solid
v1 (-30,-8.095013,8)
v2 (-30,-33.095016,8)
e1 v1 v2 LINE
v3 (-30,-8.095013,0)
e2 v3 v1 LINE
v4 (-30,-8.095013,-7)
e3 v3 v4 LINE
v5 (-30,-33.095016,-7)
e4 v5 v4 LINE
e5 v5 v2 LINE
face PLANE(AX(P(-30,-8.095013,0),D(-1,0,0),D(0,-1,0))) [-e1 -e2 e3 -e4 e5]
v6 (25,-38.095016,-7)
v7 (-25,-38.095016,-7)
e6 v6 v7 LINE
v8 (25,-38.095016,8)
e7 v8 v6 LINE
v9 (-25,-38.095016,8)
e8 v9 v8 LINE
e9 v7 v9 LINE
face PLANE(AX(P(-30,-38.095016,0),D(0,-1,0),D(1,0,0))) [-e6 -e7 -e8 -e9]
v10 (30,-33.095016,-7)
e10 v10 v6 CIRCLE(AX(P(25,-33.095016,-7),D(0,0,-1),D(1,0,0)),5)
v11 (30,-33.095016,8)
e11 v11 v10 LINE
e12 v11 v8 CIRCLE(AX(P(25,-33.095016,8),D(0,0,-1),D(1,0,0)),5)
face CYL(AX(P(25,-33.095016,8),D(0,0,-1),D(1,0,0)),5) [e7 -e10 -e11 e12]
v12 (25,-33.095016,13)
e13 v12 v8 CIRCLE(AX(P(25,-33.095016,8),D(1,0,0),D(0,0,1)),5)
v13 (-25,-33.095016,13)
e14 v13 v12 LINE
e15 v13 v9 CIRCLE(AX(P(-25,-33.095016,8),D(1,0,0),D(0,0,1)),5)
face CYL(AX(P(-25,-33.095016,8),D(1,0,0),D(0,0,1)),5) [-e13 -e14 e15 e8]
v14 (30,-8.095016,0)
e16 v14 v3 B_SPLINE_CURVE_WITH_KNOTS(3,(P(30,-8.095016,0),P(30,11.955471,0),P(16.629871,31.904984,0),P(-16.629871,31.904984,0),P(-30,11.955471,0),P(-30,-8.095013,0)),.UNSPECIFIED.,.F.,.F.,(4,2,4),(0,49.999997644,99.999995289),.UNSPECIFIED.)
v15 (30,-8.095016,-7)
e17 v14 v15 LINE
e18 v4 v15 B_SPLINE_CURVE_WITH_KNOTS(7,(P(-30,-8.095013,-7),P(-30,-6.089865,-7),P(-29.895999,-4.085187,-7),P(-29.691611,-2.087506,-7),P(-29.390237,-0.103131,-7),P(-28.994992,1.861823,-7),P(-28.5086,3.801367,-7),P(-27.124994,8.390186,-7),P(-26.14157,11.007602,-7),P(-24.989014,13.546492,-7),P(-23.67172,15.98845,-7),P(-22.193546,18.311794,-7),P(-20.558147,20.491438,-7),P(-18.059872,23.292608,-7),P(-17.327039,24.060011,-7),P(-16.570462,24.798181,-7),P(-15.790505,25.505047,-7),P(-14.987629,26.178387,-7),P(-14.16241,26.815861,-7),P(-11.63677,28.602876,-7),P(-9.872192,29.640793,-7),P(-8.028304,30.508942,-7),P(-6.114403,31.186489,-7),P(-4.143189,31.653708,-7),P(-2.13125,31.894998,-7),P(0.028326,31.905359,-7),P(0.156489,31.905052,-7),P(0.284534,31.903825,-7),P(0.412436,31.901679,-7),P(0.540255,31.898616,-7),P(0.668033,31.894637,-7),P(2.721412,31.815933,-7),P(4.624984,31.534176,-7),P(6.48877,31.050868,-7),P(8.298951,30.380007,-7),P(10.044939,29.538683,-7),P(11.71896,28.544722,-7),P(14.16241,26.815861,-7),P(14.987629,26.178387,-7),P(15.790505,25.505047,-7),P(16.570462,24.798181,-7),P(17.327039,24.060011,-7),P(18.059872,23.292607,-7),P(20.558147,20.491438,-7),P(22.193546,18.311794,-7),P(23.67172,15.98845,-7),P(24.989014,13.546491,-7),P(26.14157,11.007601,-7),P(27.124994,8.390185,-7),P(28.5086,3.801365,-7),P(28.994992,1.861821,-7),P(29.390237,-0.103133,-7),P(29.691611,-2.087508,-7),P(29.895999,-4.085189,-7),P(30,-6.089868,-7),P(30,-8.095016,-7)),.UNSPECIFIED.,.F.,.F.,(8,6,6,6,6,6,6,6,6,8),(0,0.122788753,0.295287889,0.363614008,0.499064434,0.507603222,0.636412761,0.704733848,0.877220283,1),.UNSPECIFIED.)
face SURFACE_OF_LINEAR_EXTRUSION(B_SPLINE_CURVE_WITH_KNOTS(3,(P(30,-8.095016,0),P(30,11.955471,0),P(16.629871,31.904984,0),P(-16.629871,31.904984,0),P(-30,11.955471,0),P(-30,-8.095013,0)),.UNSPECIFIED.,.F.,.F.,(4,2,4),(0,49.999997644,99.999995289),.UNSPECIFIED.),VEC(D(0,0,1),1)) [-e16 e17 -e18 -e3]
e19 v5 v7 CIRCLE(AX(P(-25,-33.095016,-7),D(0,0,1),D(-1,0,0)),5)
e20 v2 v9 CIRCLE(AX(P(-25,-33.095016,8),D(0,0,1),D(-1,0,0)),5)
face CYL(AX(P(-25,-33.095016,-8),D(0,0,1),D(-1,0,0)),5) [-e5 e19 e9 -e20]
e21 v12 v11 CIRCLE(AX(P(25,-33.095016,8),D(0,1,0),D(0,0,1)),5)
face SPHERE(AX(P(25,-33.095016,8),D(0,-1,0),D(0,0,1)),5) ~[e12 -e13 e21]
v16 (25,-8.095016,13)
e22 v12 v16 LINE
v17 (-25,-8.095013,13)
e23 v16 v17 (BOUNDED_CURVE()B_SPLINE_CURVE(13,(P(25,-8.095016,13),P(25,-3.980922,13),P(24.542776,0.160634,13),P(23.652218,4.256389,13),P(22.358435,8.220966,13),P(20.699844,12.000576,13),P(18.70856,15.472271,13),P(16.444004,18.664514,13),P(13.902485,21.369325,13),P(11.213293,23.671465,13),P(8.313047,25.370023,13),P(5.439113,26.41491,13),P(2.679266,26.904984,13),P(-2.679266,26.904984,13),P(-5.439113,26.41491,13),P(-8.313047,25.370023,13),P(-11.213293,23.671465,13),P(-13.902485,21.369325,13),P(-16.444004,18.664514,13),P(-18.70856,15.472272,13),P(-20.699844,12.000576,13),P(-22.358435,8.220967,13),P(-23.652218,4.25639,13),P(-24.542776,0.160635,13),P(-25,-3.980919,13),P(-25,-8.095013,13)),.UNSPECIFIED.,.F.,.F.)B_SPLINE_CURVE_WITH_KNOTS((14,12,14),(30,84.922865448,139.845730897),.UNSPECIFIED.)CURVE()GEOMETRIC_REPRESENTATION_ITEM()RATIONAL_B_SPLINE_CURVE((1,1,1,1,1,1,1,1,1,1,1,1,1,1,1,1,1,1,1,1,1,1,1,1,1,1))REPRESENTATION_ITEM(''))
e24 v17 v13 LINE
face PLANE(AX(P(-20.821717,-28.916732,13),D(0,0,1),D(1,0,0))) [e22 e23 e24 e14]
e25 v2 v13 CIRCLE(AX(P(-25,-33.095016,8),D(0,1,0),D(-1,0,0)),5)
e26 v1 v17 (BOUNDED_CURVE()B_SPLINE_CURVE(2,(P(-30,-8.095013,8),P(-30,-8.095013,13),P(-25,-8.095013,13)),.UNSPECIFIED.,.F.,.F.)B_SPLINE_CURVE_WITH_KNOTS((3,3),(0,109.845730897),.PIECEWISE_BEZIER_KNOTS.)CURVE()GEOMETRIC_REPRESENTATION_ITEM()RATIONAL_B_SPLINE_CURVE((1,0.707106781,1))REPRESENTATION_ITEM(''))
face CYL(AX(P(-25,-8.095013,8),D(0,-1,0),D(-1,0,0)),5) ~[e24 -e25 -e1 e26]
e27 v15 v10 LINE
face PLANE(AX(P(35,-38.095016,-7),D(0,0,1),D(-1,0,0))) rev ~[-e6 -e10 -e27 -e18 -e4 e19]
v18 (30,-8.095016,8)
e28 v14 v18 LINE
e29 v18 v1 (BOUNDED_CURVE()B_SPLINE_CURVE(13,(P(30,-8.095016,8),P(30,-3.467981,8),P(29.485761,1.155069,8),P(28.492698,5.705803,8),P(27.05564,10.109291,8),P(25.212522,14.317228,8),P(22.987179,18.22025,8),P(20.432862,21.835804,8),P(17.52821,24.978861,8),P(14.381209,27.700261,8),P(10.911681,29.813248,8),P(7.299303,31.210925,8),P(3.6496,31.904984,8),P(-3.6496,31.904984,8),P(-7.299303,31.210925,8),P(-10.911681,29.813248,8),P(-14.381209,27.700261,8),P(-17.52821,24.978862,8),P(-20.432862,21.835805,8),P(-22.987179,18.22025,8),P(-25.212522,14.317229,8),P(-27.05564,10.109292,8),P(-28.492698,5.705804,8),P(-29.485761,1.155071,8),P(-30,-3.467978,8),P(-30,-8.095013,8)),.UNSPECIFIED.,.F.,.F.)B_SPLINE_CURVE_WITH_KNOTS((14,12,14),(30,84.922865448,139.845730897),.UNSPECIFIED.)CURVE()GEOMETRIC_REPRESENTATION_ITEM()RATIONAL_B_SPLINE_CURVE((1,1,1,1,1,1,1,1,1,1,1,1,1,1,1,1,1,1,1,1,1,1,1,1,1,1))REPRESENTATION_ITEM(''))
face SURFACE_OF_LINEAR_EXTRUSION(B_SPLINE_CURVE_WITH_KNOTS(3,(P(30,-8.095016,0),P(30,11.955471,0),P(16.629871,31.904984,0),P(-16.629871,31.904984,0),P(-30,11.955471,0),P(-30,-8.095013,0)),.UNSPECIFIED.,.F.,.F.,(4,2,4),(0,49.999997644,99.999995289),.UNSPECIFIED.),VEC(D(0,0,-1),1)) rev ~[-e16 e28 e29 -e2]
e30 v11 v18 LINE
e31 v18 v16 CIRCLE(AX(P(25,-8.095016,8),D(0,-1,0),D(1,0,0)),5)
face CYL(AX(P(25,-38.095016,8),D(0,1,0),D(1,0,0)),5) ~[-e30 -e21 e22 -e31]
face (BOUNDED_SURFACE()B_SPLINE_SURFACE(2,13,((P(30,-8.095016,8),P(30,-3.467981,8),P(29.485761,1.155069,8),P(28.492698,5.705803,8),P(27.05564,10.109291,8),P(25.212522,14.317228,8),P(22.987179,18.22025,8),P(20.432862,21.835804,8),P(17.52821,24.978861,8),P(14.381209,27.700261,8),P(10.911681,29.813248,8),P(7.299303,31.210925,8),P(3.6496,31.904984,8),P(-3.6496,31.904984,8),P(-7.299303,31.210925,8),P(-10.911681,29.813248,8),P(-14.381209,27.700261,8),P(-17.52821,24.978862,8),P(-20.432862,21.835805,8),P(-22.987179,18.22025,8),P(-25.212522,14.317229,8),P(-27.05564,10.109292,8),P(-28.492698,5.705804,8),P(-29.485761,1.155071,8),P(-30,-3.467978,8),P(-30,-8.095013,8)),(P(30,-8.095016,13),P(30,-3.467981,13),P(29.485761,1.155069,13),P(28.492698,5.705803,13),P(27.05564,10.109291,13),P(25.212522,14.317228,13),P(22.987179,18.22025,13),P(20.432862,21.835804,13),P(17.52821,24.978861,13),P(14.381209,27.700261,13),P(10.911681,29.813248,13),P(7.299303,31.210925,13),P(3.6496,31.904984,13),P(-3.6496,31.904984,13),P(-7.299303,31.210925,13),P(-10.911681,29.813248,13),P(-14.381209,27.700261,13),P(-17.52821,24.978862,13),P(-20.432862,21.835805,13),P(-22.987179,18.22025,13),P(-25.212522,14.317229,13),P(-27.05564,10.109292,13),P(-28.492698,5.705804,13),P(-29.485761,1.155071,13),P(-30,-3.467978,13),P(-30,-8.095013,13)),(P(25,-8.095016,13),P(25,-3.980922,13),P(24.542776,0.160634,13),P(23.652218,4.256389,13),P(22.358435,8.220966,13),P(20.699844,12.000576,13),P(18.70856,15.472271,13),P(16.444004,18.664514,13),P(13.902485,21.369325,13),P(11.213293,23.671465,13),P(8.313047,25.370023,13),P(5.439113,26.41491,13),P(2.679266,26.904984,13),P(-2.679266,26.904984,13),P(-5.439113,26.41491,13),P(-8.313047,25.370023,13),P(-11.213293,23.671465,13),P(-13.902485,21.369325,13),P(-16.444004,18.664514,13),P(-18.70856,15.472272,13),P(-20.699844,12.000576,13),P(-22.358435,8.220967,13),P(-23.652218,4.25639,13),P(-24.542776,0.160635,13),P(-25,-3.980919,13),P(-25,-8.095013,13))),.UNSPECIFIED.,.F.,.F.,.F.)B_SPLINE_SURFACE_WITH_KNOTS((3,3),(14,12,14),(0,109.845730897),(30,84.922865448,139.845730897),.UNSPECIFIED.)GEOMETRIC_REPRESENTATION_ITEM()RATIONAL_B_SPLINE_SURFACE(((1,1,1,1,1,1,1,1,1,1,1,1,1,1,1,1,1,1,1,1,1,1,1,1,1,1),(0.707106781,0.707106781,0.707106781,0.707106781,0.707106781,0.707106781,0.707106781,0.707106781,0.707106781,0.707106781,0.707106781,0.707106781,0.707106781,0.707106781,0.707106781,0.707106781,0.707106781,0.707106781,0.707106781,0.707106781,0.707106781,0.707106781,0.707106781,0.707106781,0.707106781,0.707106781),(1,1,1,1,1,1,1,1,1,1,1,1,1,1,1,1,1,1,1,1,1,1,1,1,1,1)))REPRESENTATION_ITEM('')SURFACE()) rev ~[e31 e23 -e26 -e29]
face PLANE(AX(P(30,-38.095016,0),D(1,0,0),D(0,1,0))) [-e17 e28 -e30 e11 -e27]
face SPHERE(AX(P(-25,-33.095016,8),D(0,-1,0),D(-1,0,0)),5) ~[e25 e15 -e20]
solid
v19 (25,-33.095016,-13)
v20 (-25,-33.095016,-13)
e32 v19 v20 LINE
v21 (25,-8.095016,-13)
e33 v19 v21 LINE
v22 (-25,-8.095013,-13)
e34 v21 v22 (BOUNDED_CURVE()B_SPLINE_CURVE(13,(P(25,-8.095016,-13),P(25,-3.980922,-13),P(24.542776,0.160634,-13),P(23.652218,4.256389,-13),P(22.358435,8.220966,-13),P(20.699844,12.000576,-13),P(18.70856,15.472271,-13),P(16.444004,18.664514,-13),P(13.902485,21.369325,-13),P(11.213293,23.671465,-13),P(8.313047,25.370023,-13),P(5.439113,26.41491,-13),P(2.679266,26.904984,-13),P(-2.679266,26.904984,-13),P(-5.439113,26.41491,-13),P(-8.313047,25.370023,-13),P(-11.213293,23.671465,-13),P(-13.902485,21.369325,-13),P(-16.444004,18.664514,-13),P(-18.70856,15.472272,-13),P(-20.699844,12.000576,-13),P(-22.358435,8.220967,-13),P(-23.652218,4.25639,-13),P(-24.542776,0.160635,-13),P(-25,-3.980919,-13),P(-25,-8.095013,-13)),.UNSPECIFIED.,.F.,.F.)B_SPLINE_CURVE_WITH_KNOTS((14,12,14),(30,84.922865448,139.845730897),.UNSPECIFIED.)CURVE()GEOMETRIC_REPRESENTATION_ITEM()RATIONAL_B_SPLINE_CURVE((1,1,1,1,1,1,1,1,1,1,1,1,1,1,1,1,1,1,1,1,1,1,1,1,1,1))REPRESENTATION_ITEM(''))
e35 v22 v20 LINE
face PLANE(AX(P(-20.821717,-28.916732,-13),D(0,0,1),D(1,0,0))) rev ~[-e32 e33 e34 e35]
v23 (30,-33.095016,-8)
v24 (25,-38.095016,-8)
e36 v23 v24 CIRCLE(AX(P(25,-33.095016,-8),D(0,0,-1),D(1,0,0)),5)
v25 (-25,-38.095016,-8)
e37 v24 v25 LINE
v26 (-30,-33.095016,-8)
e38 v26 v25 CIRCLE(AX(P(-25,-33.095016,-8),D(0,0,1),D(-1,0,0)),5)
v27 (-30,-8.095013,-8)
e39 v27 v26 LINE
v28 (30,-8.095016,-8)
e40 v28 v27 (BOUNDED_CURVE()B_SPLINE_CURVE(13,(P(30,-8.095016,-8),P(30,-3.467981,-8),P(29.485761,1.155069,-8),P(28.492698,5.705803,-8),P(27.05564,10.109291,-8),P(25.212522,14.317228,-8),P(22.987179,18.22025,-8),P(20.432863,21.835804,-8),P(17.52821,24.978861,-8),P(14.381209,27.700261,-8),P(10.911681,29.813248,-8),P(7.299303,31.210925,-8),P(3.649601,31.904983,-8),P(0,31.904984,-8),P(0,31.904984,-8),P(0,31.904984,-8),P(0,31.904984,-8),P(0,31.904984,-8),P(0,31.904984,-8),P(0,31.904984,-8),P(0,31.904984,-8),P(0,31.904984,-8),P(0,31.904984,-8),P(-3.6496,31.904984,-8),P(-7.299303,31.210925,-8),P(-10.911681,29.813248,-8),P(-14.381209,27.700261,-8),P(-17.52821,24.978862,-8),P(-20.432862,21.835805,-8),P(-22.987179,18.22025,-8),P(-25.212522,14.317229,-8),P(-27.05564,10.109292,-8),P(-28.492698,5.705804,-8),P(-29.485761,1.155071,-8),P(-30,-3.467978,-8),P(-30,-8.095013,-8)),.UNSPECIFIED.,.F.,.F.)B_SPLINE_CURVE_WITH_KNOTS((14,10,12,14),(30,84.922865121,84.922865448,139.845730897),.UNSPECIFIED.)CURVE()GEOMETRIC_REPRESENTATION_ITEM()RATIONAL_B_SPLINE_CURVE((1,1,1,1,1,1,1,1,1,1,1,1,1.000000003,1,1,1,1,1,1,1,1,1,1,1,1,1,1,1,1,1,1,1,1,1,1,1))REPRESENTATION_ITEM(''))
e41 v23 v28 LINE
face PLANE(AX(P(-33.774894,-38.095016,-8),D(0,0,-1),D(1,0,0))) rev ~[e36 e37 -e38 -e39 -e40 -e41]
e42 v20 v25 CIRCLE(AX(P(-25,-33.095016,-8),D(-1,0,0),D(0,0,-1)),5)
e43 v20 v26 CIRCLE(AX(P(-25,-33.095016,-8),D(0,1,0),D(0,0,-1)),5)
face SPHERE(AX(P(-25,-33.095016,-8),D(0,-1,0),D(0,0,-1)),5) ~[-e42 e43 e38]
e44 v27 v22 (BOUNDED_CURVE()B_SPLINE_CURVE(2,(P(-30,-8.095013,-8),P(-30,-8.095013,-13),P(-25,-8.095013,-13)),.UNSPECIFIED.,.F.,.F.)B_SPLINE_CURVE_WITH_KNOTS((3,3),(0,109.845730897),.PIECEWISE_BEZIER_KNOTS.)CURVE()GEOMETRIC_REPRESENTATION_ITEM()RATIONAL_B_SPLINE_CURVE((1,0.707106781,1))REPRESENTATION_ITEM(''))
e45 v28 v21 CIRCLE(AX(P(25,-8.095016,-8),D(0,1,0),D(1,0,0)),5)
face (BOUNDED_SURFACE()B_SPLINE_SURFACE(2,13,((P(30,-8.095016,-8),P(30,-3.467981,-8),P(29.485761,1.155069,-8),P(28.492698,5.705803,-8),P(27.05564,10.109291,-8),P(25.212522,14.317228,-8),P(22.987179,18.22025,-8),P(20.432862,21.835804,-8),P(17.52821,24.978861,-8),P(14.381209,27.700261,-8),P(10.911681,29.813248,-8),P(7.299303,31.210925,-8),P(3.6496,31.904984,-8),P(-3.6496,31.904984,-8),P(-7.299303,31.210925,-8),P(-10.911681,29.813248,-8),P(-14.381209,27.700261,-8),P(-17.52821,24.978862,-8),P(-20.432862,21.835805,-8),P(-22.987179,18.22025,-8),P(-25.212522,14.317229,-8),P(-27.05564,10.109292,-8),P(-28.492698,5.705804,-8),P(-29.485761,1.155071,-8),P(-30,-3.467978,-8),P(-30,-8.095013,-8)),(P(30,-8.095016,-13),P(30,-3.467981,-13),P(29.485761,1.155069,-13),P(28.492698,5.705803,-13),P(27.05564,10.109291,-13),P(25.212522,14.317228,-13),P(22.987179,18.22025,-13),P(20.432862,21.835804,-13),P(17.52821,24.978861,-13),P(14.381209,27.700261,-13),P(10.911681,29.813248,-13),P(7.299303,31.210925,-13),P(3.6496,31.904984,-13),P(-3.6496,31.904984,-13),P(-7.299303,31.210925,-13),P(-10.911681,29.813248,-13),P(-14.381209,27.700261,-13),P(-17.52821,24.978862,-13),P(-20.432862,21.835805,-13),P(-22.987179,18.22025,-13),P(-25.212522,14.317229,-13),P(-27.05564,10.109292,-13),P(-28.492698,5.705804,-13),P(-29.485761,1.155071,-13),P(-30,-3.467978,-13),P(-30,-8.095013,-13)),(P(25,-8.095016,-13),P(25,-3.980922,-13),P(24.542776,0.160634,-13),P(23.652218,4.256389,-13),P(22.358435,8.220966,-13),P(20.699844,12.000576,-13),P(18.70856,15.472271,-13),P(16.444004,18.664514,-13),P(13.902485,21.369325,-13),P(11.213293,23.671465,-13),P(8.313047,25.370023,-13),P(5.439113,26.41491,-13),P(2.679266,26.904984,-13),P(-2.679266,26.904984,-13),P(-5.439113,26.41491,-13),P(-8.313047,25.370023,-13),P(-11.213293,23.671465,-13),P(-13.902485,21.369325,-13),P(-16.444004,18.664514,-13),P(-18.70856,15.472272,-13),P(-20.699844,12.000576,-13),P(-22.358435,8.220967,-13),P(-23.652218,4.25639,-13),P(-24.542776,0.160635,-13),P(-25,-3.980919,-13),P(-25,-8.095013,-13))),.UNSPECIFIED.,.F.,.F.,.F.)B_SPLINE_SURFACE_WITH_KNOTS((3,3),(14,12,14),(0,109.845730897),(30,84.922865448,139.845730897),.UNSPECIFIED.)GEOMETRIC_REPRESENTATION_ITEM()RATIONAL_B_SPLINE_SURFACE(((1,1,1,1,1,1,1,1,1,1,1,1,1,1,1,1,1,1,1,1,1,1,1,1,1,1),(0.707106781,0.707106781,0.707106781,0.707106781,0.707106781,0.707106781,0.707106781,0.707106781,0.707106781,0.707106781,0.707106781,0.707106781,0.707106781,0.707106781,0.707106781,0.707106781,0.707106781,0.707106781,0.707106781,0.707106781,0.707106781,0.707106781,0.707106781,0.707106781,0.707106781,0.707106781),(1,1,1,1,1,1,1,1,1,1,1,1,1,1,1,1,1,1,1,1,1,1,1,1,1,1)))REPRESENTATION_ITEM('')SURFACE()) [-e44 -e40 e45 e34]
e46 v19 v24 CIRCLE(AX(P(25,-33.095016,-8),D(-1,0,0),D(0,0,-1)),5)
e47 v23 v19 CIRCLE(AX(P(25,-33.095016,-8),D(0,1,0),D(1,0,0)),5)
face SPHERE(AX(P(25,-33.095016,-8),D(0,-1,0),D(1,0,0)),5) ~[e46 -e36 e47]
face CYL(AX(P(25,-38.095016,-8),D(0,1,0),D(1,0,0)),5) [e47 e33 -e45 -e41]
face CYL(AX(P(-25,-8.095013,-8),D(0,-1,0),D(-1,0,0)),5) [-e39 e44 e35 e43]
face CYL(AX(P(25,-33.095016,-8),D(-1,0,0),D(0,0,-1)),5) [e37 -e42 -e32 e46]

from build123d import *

# Parameters (mm, degrees)
F1_DEPTH = 13
F2_R     = 5
F3_R     = 5
F4_W     = 33.7748937309
F4_H     = 1
F4_W_2   = 35
F5_DEPTH = 70


# Not quite as in the source:
# - ends of sketch curves that miss each other by under 0.0002 mm in the source are joined
# - a feature of the source that left no trace in its solid (it failed there, or was rolled back) is left out


with BuildPart() as f1:
    # F0 (on Top) → F1 (new body, symmetric)
    with BuildSketch(Plane.XY):
        with BuildLine():
            Line((-30, -8.0950134536), (-30, -38.0950163982))
            Line((-30, -38.0950163982), (0, -38.0950163982))
            ThreePointArc((0, -38.0950163982), (-21.2132044767, -29.3082187928), (-30, -8.0950134536))
        make_face()
        with BuildLine():
            ThreePointArc((30, -8.0950163982), (21.2132034356, -29.3082198338), (0, -38.0950163982))
            Line((0, -38.0950163982), (30, -38.0950163982))
            Line((30, -38.0950163982), (30, -8.0950163982))
        make_face()
        with BuildLine():
            ThreePointArc((-30, -8.0950134536), (-21.2132044767, -29.3082187928), (0, -38.0950163982))
            ThreePointArc((0, -38.0950163982), (21.2132034356, -29.3082198338), (30, -8.0950163982))
            ThreePointArc((30, -8.0950163982), (1.4723e-06, 21.9049836018), (-30, -8.0950134536))
        make_face()
        with BuildLine():
            add(Edge.make_bspline(
                [(0, 31.9049836018), (-16.629870981, 31.9049836018), (-30, 11.955471457), (-30, -8.0950134536)],
                knots=[0, 0, 0, 0, 49.9999976443, 49.9999976443, 49.9999976443, 49.9999976443], degree=3))
            ThreePointArc((-30, -8.0950134536), (1.4723e-06, 21.9049836018), (30, -8.0950163982))
            add(Edge.make_bspline(
                [(0, 31.9049836018), (16.629870981, 31.9049836018), (30, 11.955471457), (30, -8.0950163982)],
                knots=[0, 0, 0, 0, 49.9999976443, 49.9999976443, 49.9999976443, 49.9999976443], degree=3))
        make_face()
    extrude(amount=F1_DEPTH, both=True)

    # F2
    f2_edges = [f1.edges().sort_by_distance(p)[0] for p in [
        (30, -23.095016, -13),
        (30, -23.095016, 13),
        (-30, -23.095015, 13),
        (-30, -23.095015, -13),
    ]]
    fillet(f2_edges, radius=F2_R)

    # F3
    f3_edges = [f1.edges().sort_by_distance(p)[0] for p in [
        (-30, -38.095016, 0),
        (-28.535534, -38.095016, -11.535534),
        (-28.535534, -38.095016, 11.535534),
        (0, -38.095016, -13),
        (0, -38.095016, 13),
        (28.535534, -38.095016, -11.535534),
        (28.535534, -38.095016, 11.535534),
        (30, -38.095016, 0),
    ]]
    fillet(f3_edges, radius=F3_R)

    # F4 (on face) → F5 (cut)
    with BuildSketch(Plane.XZ.offset(38.0950163982)):
        with Locations((-16.8874468654, -7.5)):
            Rectangle(F4_W, F4_H)
        with Locations((17.5, -7.5)):
            Rectangle(F4_W_2, F4_H)
    extrude(amount=-F5_DEPTH, mode=Mode.SUBTRACT)


solid = f1.part
